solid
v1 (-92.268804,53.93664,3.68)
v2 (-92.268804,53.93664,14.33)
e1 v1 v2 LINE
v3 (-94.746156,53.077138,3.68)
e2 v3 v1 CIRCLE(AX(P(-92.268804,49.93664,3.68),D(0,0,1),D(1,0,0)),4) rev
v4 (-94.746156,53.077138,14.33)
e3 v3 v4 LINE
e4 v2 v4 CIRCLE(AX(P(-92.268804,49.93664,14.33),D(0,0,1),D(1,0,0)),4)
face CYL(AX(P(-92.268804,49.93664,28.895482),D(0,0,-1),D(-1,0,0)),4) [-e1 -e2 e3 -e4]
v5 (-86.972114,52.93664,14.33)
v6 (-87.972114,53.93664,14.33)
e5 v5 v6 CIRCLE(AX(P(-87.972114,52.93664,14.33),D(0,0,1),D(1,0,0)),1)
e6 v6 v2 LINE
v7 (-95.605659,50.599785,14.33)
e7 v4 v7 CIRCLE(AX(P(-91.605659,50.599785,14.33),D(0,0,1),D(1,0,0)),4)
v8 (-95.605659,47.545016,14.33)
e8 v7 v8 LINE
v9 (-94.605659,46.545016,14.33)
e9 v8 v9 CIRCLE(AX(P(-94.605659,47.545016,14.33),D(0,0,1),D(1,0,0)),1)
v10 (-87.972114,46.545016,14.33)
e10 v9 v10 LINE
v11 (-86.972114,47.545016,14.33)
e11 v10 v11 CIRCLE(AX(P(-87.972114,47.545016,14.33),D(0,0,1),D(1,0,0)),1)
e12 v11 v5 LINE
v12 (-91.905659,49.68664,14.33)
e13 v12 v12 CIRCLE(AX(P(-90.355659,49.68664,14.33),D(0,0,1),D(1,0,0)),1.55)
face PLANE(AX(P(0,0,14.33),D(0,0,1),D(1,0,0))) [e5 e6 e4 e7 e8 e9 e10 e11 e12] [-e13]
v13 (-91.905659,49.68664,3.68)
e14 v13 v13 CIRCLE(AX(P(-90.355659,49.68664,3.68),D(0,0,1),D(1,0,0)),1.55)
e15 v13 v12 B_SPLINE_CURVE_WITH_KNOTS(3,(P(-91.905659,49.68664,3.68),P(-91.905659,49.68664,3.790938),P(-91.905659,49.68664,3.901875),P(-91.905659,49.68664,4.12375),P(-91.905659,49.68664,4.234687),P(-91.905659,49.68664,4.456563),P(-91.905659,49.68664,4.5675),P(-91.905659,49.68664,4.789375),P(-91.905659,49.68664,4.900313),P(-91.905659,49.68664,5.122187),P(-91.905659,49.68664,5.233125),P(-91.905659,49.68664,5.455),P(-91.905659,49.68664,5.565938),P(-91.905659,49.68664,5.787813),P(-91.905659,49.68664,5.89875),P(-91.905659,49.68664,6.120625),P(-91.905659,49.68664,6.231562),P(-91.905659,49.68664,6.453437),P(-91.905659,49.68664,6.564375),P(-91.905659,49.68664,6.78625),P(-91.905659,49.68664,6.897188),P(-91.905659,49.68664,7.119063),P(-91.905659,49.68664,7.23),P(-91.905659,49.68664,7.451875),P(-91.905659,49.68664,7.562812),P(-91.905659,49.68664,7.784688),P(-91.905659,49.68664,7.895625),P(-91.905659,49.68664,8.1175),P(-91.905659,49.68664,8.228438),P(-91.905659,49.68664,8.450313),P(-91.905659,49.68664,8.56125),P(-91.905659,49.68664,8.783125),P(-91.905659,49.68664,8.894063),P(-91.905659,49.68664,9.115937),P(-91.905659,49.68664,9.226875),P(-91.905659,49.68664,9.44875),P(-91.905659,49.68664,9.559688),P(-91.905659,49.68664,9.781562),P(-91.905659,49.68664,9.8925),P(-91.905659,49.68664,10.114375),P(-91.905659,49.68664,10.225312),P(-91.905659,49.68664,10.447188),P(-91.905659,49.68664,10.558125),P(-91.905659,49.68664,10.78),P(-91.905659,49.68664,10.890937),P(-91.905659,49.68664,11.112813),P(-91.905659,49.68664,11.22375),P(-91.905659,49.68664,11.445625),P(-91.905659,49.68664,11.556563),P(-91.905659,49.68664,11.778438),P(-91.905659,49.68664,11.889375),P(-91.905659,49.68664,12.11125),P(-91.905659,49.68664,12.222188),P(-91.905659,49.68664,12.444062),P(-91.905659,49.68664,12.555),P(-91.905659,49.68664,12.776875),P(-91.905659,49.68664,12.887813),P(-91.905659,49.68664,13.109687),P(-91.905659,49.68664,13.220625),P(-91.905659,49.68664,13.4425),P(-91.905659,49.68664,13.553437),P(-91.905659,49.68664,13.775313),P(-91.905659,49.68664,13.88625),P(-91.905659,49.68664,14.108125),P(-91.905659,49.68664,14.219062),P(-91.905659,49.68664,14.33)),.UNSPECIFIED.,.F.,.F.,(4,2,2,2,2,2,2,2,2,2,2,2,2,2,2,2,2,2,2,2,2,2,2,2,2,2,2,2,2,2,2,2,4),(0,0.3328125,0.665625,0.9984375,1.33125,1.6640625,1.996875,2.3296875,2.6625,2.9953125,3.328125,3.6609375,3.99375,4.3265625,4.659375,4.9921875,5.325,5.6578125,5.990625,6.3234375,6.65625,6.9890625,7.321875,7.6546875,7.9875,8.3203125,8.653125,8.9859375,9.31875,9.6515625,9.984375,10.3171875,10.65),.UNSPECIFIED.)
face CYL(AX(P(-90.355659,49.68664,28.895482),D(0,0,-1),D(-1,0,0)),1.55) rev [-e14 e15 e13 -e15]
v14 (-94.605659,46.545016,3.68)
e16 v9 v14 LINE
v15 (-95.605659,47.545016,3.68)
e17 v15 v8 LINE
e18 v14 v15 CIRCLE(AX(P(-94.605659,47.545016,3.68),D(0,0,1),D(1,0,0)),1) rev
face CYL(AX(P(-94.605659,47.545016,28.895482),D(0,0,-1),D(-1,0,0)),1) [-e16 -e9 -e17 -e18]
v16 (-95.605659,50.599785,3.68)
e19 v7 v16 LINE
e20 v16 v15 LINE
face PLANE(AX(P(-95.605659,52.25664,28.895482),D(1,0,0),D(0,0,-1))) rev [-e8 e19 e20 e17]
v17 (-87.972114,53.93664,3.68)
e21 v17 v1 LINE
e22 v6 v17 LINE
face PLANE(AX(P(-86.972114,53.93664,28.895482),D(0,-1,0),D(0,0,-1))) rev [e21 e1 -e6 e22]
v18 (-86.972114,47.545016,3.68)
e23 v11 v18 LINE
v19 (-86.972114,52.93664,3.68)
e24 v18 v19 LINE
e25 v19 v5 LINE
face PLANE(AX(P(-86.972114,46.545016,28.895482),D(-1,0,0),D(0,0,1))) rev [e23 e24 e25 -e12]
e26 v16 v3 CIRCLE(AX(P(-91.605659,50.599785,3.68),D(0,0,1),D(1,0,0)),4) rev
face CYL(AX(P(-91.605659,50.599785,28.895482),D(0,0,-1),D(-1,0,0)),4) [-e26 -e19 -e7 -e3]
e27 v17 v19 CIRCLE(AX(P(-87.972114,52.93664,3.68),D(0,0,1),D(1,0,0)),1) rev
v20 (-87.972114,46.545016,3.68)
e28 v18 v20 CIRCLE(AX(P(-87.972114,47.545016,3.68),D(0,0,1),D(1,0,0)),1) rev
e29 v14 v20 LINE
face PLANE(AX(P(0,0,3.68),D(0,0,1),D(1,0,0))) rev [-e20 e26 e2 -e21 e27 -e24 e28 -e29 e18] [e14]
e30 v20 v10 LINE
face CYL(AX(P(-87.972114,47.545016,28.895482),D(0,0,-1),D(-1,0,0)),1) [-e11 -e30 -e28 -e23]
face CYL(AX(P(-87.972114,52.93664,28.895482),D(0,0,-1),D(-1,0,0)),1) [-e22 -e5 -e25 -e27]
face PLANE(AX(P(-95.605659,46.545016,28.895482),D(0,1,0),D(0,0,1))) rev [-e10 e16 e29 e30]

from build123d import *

# Parameters (mm, degrees)
SKETCH_1_R          = 1.531489915
EXTRUDE_1_DEPTH     = 1.68
SKETCH_1_R_2        = 1.063949022
EXTRUDE_1_2_DEPTH   = 1.68
SKETCH_1_R_3        = 2.489250022
EXTRUDE_1_3_DEPTH   = 1.68
SKETCH_1_W          = 72.86
SKETCH_1_H          = 61.86
SKETCH_1_R_4        = 1.55
EXTRUDE_1_4_DEPTH   = 1.68
SKETCH_2_R          = 3
SKETCH_2_R_2        = 1.55
EXTRUDE_3_DEPTH     = 2
SKETCH_3_W          = 72.86
SKETCH_3_H          = 61.86
SKETCH_3_W_2        = 69.50125591
SKETCH_3_H_2        = 58.5
EXTRUDE_4_DEPTH     = 15.85
SKETCH_4_W          = 17
SKETCH_4_H          = 15
CUT_EXTRUDE_1_DEPTH = 3.68
SKETCH_6_W          = 7.25
SKETCH_6_H          = 16
SKETCH_6_W_2        = 2.5
SKETCH_6_H_2        = 18
CUT_EXTRUDE_3_DEPTH = 7.8
SKETCH_7_W          = 10
SKETCH_7_H          = 4
SKETCH_7_W_2        = 17
SKETCH_7_H_2        = 8
SKETCH_7_W_3        = 8
SKETCH_7_H_3        = 13.300256909
CUT_EXTRUDE_5_DEPTH = 2
SKETCH_8_R          = 1.556852558
SKETCH_8_W          = 2.041099746
SKETCH_8_H          = 24.945353107
CUT_EXTRUDE_6_DEPTH = 2
FILLET_1_R          = 1.68
FILLET_2_R          = 2
FILLET_3_R          = 1.68
FILLET_4_R          = 2
FILLET_5_R          = 3
FILLET_6_R          = 1
FILLET_7_R          = 1
SKETCH_9_R          = 4
CUT_EXTRUDE_7_DEPTH = 0.8
SKETCH_10_W         = 44.758598589
SKETCH_10_H         = 6.5
SKETCH_10_W_2       = 44.448850503
CUT_EXTRUDE_8_DEPTH = 0.8
SKETCH_11_R         = 1.55
EXTRUDE_6_DEPTH     = 10.65
CUT_EXTRUDE_9_DEPTH = 62.6
FILLET_8_R          = 4
FILLET_9_R          = 1


with BuildPart() as part:
    # 草图1 → 凸台-拉伸1 (new body)
    with BuildSketch(Plane.XY):
        with Locations((1.504266973, 51.672660554)):
            Circle(SKETCH_1_R)
    extrude(amount=EXTRUDE_1_DEPTH)


with BuildPart() as body_2:
    # 草图1 → Extrude 1 2 (new body)
    with BuildSketch(Plane.XY):
        with Locations((-18.258772408, 61.840992468)):
            Circle(SKETCH_1_R_2)
    extrude(amount=EXTRUDE_1_2_DEPTH)


with BuildPart() as body_3:
    # 草图1 → Extrude 1 3 (new body)
    with BuildSketch(Plane.XY):
        with Locations((-18.258772408, -10.975845657)):
            Circle(SKETCH_1_R_3)
    extrude(amount=EXTRUDE_1_3_DEPTH)


with BuildPart() as body_4:
    # 草图1 → Extrude 1 4 (new body)
    with BuildSketch(Plane.XY):
        with Locations((-46.758772408, 26.672660554)):
            Rectangle(SKETCH_1_W, SKETCH_1_H)
        with Locations((-76.258772408, 51.672660554)):
            Circle(SKETCH_1_R_4, mode=Mode.SUBTRACT)
        with Locations((-18.258772408, 51.672660554)):
            Circle(SKETCH_1_R_4, mode=Mode.SUBTRACT)
        with Locations((-76.258772408, 2.672660554)):
            Circle(SKETCH_1_R_4, mode=Mode.SUBTRACT)
        with Locations((-18.258772408, 2.672660554)):
            Circle(SKETCH_1_R_4, mode=Mode.SUBTRACT)
    extrude(amount=EXTRUDE_1_4_DEPTH)

    # 草图2 → 凸台-拉伸3 (add)
    # profile 1 of 4: a face of its own
    with BuildSketch(Plane.XY.offset(1.68)):
        with Locations((-76.258772408, 2.672660554)):
            Circle(SKETCH_2_R)
        with Locations((-76.258772408, 2.672660554)):
            Circle(SKETCH_2_R_2, mode=Mode.SUBTRACT)
    # profile 2 of 4: a face of its own
    with BuildSketch(Plane.XY.offset(1.68)):
        with Locations((-18.258772408, 2.672660554)):
            Circle(SKETCH_2_R)
        with Locations((-18.258772408, 2.672660554)):
            Circle(SKETCH_2_R_2, mode=Mode.SUBTRACT)
    # profile 3 of 4: a face of its own
    with BuildSketch(Plane.XY.offset(1.68)):
        with Locations((-76.258772408, 51.672660554)):
            Circle(SKETCH_2_R)
        with Locations((-76.258772408, 51.672660554)):
            Circle(SKETCH_2_R_2, mode=Mode.SUBTRACT)
    # profile 4 of 4: a face of its own
    with BuildSketch(Plane.XY.offset(1.68)):
        with Locations((-18.258772408, 51.672660554)):
            Circle(SKETCH_2_R)
        with Locations((-18.258772408, 51.672660554)):
            Circle(SKETCH_2_R_2, mode=Mode.SUBTRACT)
    extrude(amount=EXTRUDE_3_DEPTH)

    # 草图3 → 凸台-拉伸4 (add)
    with BuildSketch(Plane.XY.offset(1.68)):
        with Locations((-46.758772408, 26.672660554)):
            Rectangle(SKETCH_3_W, SKETCH_3_H)
        with Locations((-46.758144453, 26.672660554)):
            Rectangle(SKETCH_3_W_2, SKETCH_3_H_2, mode=Mode.SUBTRACT)
    extrude(amount=EXTRUDE_4_DEPTH)

    # 草图4 → 切除-拉伸1 (cut)
    with BuildSketch(Plane(origin=(0, 0, 0), x_dir=(-1, 0, 0), z_dir=(0, 0, -1))):
        with Locations((74.688772408, 28.322197805)):
            Rectangle(SKETCH_4_W, SKETCH_4_H)
    extrude(amount=-CUT_EXTRUDE_1_DEPTH, mode=Mode.SUBTRACT)

    # 草图6 → 切除-拉伸3 (cut)
    with BuildSketch(Plane(origin=(-10.328772408, 0, 0), x_dir=(0, 0, -1), z_dir=(1, 0, 0))):
        with Locations((-8.625, 30.672660554)):
            Rectangle(SKETCH_6_W, SKETCH_6_H)
        with Locations((-14.975303343, 19.628822862)):
            Rectangle(SKETCH_6_W_2, SKETCH_6_H_2)
    extrude(amount=-CUT_EXTRUDE_3_DEPTH, mode=Mode.SUBTRACT)

    # 草图7 → 切除-拉伸5 (cut)
    with BuildSketch(Plane.XZ.offset(4.257339446)):
        with Locations((-69.258772408, 6.68)):
            Rectangle(SKETCH_7_W, SKETCH_7_H)
        with Locations((-47.758772408, 8.68)):
            Rectangle(SKETCH_7_W_2, SKETCH_7_H_2)
        with Locations((-26.258772408, 11.330128455)):
            Rectangle(SKETCH_7_W_3, SKETCH_7_H_3)
    extrude(amount=-CUT_EXTRUDE_5_DEPTH, mode=Mode.SUBTRACT)

    # 草图8 → 切除-拉伸6 (cut)
    with BuildSketch(Plane.ZY.offset(83.188772408)):
        with Locations((7.843859074, 9.687980695)):
            Circle(SKETCH_8_R)
        with Locations((7.730007332, 28.982792683)):
            Rectangle(SKETCH_8_W, SKETCH_8_H)
    extrude(amount=-CUT_EXTRUDE_6_DEPTH, mode=Mode.SUBTRACT)

    # 圆角1
    fillet_1_edges = [body_4.edges().sort_by_distance(p)[0] for p in [
        (-12.007516498, 55.922660554, 9.605),
        (-81.508772408, 55.922660554, 9.605),
        (-81.508772408, -2.577339446, 9.605),
        (-12.007516498, -2.577339446, 9.605),
        (-10.328772408, -4.257339446, 8.765),
        (-83.188772408, -4.257339446, 8.765),
        (-83.188772408, 57.602660554, 8.765),
        (-10.328772408, 57.602660554, 8.765),
    ]]
    fillet(fillet_1_edges, radius=FILLET_1_R)

    # 圆角2
    fillet_2_edges = [body_4.edges().sort_by_distance(p)[0] for p in [
        (-66.188772408, 20.822197805, 0.84),
        (-66.188772408, 35.822197805, 0.84),
    ]]
    fillet(fillet_2_edges, radius=FILLET_2_R)

    # 圆角3
    fillet_3_edges = [body_4.edges().sort_by_distance(p)[0] for p in [
        (-74.258772408, -3.417339446, 4.68),
        (-64.258772408, -3.417339446, 4.68),
    ]]
    fillet(fillet_3_edges, radius=FILLET_3_R)

    # 圆角4
    fillet_4_edges = [body_4.edges().sort_by_distance(p)[0] for p in [
        (-56.258772408, -3.417339446, 4.68),
        (-39.258772408, -3.417339446, 4.68),
    ]]
    fillet(fillet_4_edges, radius=FILLET_4_R)

    # 圆角5
    fillet_5_edges = [body_4.edges().sort_by_distance(p)[0] for p in [
        (-30.258772408, -3.417339446, 4.68),
        (-22.258772408, -3.417339446, 4.68),
    ]]
    fillet(fillet_5_edges, radius=FILLET_5_R)

    # 圆角6
    fillet_6_edges = [body_4.edges().sort_by_distance(p)[0] for p in [
        (-11.168144453, 10.628822862, 16.225303343),
        (-11.168144453, 28.628822862, 16.225303343),
        (-11.168144453, 28.628822862, 13.725303343),
        (-11.168144453, 10.628822862, 13.725303343),
    ]]
    fillet(fillet_6_edges, radius=FILLET_6_R)

    # 圆角7
    fillet_7_edges = [body_4.edges().sort_by_distance(p)[0] for p in [
        (-11.168144453, 38.672660554, 5),
        (-11.168144453, 22.672660554, 5),
        (-11.168144453, 22.672660554, 12.25),
        (-11.168144453, 38.672660554, 12.25),
        (-82.348772408, 16.510116129, 6.709457459),
        (-82.348772408, 41.455469236, 6.709457459),
        (-82.348772408, 41.455469236, 8.750557205),
        (-82.348772408, 16.510116129, 8.750557205),
        (-82.348772408, 20.822197805, 3.68),
        (-82.348772408, 35.822197805, 3.68),
    ]]
    fillet(fillet_7_edges, radius=FILLET_7_R)

    # 草图9 → 切除-拉伸7 (cut)
    with BuildSketch(Plane(origin=(0, 0, 0), x_dir=(-1, 0, 0), z_dir=(0, 0, -1))):
        with Locations((18.258772408, 51.672660554)):
            Circle(SKETCH_9_R)
        with Locations((76.258772408, 51.672660554)):
            Circle(SKETCH_9_R)
        with Locations((18.258772408, 2.672660554)):
            Circle(SKETCH_9_R)
        with Locations((76.258772408, 2.672660554)):
            Circle(SKETCH_9_R)
    extrude(amount=-CUT_EXTRUDE_7_DEPTH, mode=Mode.SUBTRACT)

    # 草图10 → 切除-拉伸8 (cut)
    with BuildSketch(Plane(origin=(0, 0, 0), x_dir=(-1, 0, 0), z_dir=(0, 0, -1))):
        with Locations((41.37196271, 38.672660554)):
            Rectangle(SKETCH_10_W, SKETCH_10_H)
        with Locations((41.37196271, 14.672660554)):
            Rectangle(SKETCH_10_W_2, SKETCH_10_H)
    extrude(amount=-CUT_EXTRUDE_8_DEPTH, mode=Mode.SUBTRACT)

    # 草图11 → 凸台-拉伸6 (add)
    # profile 1 of 2: a face of its own
    with BuildSketch(Plane.XY.offset(3.68)):
        Polygon((-79.828772408, 55.922660554), (-81.508772408, 54.242660554), (-81.508772408, 48.531036753), (-72.875228226, 48.531036753), (-72.875228226, 55.922660554), align=None)
        with Locations(Location((-76.258772408, 51.672660554, 0), (0, 0, 180))):
            Circle(SKETCH_11_R, mode=Mode.SUBTRACT)
    # profile 2 of 2: a face of its own
    with BuildSketch(Plane.XY.offset(3.68)):
        Polygon((-93.925658587, 53.936639744), (-95.605658587, 52.256639744), (-95.605658587, 46.545015943), (-86.972114405, 46.545015943), (-86.972114405, 53.936639744), align=None)
        with Locations(Location((-90.355658587, 49.686639744, 0), (0, 0, 180))):
            Circle(SKETCH_11_R, mode=Mode.SUBTRACT)
    extrude(amount=EXTRUDE_6_DEPTH)


with BuildPart() as extrude_6_piece_1:
    # of the separate pieces the step leaves, piece 1, a body of its own (extrude_6_pieces)
    add(body_4.part.solids().sort_by_distance((-10.328772408, 38.672660554, 6))[0])


with BuildPart() as extrude_6_piece_2:
    # of the separate pieces the step leaves, piece 2, a body of its own (extrude_6_pieces)
    add(body_4.part.solids().sort_by_distance((-93.925658587, 53.936639744, 3.68))[0])

    # 圆角8
    # the kernel refuses this fillet: 4 mm, written as the material it takes off along each edge
    with BuildSketch(Plane(origin=(-93.925658587, 53.936639744, -0.462135624), x_dir=(-0.7071067811865455, -0.7071067811865497, 0), z_dir=(0, 0, 1))) as fillet_8_piece_1:
        with BuildLine():
            CenterArc((FILLET_8_R * 0.414213562373, FILLET_8_R), FILLET_8_R, 225, 45)
            Line((-FILLET_8_R * 0.292893218813, FILLET_8_R * 0.292893218813), (0, 0))
            Line((0, 0), (FILLET_8_R * 0.414213562373, 0))
        make_face()
    extrude(amount=18.934271247, mode=Mode.SUBTRACT)
    with BuildSketch(Plane(origin=(-95.605658587, 52.256639744, -0.462135624), x_dir=(0.7071067811865411, 0.707106781186554, 0), z_dir=(0, 0, 1))) as fillet_8_piece_2:
        with BuildLine():
            CenterArc((FILLET_8_R * 0.414213562373, -FILLET_8_R), FILLET_8_R, 90, 45)
            Line((-FILLET_8_R * 0.292893218813, -FILLET_8_R * 0.292893218813), (0, 0))
            Line((0, 0), (FILLET_8_R * 0.414213562373, 0))
        make_face()
    extrude(amount=18.934271247, mode=Mode.SUBTRACT)

    # 圆角9
    fillet_9_edges = [extrude_6_piece_2.edges().sort_by_distance(p)[0] for p in [
        (-86.972114405, 53.936639744, 9.005),
        (-86.972114405, 46.545015943, 9.005),
        (-95.605658587, 46.545015943, 9.005),
    ]]
    fillet(fillet_9_edges, radius=FILLET_9_R)


with BuildPart() as cut_extrude_9_tool:
    # 草图13 → 切除-拉伸9 (new body)
    with BuildSketch(Plane.XY.offset(17.53)):
        Polygon((-85.534397359, 61.466506159), (-87.240895033, -11.116528255), (-1.802244806, -17.146153371), (14.580132867, 61.466506159), (-40.278079036, 71.546219088), align=None)
    extrude(amount=-CUT_EXTRUDE_9_DEPTH)


with BuildPart() as part_1:
    add(part.part)

    # 切除-拉伸9: cut by cut_extrude_9_tool
    add(cut_extrude_9_tool.part, mode=Mode.SUBTRACT)


with BuildPart() as body_2_1:
    add(body_2.part)

    # 切除-拉伸9: cut by cut_extrude_9_tool
    add(cut_extrude_9_tool.part, mode=Mode.SUBTRACT)


with BuildPart() as body_3_1:
    add(body_3.part)

    # 切除-拉伸9: cut by cut_extrude_9_tool
    add(cut_extrude_9_tool.part, mode=Mode.SUBTRACT)


with BuildPart() as extrude_6_piece_1_1:
    add(extrude_6_piece_1.part)

    # 切除-拉伸9: cut by cut_extrude_9_tool
    add(cut_extrude_9_tool.part, mode=Mode.SUBTRACT)


solid = extrude_6_piece_2.part
